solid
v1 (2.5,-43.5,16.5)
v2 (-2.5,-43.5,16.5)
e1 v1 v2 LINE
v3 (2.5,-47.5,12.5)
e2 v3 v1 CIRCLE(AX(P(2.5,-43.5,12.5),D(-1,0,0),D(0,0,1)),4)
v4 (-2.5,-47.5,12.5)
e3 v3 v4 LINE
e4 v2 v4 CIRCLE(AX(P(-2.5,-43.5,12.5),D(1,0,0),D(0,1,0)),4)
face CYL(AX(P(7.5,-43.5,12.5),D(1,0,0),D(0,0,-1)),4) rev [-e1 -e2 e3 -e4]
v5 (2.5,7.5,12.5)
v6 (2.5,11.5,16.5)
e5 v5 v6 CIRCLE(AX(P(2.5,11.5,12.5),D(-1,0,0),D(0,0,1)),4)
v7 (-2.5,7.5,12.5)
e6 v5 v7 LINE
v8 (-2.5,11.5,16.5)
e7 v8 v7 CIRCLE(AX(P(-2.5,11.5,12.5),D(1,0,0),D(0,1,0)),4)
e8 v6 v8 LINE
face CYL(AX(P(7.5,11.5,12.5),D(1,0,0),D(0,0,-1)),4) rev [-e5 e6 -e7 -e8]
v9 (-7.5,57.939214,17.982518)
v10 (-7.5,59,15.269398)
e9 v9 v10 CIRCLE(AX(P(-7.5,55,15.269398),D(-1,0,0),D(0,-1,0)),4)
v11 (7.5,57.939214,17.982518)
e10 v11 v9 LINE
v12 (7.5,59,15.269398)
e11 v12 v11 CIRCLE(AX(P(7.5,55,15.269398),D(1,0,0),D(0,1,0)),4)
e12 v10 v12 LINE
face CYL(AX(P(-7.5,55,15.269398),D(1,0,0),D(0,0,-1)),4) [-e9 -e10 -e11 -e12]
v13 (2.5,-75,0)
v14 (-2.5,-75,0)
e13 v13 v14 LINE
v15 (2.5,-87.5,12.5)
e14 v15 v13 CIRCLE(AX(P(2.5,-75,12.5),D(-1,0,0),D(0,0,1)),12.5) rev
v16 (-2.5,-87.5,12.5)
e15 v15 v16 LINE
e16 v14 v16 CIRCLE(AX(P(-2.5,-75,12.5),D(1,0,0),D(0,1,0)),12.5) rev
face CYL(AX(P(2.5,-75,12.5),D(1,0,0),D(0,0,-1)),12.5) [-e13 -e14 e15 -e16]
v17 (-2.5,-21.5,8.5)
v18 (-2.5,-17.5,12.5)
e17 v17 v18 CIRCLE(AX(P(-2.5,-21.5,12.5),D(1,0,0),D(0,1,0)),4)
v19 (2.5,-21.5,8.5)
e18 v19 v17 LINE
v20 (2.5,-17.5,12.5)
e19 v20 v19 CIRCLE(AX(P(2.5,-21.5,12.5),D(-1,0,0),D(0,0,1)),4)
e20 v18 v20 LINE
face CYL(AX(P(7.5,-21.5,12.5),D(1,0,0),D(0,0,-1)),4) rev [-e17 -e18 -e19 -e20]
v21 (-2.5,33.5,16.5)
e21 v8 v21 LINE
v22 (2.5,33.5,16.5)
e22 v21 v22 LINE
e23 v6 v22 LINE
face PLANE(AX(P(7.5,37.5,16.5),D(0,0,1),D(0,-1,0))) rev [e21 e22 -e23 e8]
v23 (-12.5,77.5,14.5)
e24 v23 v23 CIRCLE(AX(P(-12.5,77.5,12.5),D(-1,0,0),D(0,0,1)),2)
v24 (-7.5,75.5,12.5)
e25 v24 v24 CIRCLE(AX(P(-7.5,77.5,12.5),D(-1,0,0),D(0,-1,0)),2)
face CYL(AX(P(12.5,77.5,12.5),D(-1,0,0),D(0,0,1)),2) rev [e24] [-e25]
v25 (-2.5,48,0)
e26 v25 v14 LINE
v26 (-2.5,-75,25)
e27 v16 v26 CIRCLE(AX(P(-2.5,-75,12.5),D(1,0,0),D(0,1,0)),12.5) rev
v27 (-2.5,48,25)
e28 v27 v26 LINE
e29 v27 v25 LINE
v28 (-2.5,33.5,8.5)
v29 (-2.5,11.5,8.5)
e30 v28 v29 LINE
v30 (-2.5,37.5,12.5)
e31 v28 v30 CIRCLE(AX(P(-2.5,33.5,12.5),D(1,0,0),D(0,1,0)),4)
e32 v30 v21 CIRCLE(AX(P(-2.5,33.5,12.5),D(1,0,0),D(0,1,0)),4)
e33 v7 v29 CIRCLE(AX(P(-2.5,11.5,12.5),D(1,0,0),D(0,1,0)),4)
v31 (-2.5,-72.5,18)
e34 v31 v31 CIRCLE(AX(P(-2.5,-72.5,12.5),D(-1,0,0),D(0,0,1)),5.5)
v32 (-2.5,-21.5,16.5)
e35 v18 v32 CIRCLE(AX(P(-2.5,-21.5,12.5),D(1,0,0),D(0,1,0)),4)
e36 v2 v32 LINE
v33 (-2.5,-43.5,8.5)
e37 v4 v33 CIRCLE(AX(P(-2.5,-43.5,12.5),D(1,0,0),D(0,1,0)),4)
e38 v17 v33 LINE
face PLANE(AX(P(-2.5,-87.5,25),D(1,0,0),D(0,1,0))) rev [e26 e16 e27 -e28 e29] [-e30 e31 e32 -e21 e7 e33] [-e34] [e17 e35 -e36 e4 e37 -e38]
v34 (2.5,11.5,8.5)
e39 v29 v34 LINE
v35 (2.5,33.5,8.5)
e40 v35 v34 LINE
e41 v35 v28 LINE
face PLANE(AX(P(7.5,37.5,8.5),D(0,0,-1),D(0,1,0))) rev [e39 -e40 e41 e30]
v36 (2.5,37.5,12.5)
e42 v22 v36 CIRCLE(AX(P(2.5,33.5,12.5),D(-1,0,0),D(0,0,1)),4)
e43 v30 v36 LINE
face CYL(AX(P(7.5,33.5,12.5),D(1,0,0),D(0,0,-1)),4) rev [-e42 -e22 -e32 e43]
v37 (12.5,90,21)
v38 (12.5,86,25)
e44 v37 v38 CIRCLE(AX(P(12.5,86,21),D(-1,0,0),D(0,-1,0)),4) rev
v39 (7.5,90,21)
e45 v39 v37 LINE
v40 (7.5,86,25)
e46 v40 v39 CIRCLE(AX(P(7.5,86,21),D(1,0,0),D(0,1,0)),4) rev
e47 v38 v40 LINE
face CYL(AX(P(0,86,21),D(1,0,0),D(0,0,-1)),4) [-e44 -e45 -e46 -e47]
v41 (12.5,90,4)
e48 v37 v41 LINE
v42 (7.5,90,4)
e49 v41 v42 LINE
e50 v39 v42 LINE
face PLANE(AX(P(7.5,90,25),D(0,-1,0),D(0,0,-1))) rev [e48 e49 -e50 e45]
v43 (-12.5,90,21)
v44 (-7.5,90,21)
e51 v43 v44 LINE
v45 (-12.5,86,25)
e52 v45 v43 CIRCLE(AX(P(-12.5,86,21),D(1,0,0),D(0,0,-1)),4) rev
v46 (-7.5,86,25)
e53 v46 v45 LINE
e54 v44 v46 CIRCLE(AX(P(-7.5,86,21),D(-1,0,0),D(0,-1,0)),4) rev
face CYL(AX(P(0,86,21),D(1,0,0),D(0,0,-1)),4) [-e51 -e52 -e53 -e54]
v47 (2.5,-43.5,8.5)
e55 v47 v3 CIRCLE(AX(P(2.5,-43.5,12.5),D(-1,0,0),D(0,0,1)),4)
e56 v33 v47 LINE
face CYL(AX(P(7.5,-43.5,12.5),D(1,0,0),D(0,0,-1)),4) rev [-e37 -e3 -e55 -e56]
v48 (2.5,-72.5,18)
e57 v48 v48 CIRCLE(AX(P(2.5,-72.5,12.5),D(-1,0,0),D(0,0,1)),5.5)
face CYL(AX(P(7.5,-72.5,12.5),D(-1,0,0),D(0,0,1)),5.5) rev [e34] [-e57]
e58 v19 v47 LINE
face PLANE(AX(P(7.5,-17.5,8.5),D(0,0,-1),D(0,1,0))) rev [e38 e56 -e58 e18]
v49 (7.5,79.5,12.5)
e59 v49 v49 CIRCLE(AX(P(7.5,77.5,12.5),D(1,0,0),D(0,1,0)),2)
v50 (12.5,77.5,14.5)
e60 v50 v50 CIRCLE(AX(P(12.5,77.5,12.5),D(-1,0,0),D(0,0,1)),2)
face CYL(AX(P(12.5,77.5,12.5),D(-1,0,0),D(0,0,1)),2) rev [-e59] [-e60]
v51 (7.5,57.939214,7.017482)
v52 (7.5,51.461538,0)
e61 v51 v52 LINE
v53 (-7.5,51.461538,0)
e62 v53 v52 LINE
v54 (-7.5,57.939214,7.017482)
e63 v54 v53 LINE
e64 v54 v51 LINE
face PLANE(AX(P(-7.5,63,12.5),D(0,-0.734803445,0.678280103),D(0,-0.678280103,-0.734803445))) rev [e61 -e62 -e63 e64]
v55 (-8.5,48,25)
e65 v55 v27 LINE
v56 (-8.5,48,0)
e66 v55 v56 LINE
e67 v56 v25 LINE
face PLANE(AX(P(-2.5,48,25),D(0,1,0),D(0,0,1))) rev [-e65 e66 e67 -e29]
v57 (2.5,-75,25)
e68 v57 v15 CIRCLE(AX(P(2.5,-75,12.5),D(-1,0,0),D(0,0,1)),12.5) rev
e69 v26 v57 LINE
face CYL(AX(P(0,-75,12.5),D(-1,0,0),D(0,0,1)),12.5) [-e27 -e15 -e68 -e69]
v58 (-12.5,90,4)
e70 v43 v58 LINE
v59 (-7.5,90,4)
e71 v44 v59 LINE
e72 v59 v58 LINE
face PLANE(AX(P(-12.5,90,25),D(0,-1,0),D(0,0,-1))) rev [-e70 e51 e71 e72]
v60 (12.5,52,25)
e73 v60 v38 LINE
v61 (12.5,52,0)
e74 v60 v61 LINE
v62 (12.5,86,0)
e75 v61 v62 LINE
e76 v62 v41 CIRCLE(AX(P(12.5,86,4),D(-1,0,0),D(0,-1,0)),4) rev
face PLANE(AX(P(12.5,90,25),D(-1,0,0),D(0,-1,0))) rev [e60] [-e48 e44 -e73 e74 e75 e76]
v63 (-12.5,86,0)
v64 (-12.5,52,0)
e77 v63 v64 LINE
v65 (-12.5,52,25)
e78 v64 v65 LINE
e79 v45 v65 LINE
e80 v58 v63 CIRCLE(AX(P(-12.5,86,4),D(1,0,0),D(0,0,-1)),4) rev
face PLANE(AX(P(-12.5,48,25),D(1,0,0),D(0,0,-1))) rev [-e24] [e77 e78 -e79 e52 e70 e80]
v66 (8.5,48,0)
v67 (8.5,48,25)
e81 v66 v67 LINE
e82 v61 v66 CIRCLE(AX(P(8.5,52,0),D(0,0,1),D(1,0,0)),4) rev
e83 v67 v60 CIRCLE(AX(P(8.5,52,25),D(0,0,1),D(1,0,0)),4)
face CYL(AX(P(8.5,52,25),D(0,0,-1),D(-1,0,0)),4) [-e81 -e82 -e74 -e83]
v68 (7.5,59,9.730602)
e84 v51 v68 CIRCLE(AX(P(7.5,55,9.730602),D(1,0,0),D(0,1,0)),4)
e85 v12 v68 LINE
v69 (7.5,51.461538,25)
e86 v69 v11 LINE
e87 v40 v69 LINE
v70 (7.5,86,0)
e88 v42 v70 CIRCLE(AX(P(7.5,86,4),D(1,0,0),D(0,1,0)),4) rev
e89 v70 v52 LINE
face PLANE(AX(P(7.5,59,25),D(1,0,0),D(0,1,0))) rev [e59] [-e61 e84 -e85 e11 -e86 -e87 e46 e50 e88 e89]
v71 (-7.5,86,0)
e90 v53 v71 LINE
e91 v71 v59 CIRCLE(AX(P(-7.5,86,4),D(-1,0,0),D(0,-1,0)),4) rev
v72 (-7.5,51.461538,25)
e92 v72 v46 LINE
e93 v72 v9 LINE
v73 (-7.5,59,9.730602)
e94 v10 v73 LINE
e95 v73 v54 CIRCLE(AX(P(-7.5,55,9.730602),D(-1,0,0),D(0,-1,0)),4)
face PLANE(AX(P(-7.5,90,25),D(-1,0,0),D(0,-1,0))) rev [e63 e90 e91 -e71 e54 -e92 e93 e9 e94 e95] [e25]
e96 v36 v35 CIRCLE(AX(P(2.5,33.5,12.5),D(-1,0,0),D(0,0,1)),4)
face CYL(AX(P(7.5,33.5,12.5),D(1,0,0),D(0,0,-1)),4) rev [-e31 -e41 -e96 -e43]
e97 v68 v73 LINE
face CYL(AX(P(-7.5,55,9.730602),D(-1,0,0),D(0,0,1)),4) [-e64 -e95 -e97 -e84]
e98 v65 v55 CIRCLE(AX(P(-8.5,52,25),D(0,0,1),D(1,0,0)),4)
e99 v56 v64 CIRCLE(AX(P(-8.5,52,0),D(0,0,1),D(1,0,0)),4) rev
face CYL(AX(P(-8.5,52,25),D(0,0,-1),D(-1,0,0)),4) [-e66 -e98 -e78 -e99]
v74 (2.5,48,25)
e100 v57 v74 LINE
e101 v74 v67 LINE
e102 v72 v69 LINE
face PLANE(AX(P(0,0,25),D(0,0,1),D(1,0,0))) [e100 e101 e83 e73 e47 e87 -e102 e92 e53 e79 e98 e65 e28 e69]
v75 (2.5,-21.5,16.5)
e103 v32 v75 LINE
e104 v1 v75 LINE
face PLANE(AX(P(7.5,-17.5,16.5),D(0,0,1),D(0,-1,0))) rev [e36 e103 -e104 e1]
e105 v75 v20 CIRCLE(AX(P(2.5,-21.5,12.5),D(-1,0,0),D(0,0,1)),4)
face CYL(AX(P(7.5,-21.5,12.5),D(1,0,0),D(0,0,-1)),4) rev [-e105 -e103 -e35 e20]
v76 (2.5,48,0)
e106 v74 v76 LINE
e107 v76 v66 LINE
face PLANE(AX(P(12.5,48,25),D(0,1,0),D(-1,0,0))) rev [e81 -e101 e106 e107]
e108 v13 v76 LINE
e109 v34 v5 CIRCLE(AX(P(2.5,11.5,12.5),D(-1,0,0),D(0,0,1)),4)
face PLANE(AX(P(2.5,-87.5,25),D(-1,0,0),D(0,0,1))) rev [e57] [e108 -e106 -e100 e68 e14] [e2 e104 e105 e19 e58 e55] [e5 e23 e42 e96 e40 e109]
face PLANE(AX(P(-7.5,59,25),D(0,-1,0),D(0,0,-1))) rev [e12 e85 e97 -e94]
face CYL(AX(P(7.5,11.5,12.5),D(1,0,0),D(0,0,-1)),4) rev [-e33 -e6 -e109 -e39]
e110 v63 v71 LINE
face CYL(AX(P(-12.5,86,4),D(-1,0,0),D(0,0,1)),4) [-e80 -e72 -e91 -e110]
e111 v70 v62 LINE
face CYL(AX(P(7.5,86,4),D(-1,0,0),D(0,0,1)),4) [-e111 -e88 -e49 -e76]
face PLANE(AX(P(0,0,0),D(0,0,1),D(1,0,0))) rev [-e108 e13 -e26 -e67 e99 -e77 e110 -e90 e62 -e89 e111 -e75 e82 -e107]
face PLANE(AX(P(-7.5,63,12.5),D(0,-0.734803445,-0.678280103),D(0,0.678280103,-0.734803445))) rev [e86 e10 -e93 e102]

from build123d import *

# Parameters (mm, degrees)
Y_KSEKLIK_EKSTR_ZYON1_DEPTH = 25
IZIM2_R                     = 2
KES_EKSTR_ZYON1_DEPTH       = 25
IZIM3_R                     = 5.5
IZIM3_W                     = 8
IZIM3_H                     = 30
KES_EKSTR_ZYON2_DEPTH       = 10
CUT_EXTRUDE8_DEPTH          = 7.5
RADYUS1_R                   = 4
FILLET1_R                   = 12.5


with BuildPart() as part:
    # Çizim1 → Yükseklik-Ekstrüzyon1 (new body)
    with BuildSketch(Plane.XY):
        Polygon((-2.5, 48), (-12.5, 48), (-12.5, 90), (-7.5, 90), (-7.5, 59), (7.5, 59), (7.5, 90), (12.5, 90), (12.5, 48), (2.5, 48), (2.5, -87.5), (-2.5, -87.5), align=None)
    extrude(amount=Y_KSEKLIK_EKSTR_ZYON1_DEPTH)

    # Çizim2 → Kes-Ekstrüzyon1 (cut)
    with BuildSketch(Plane.ZY.offset(12.5)):
        with Locations((12.5, 77.5)):
            Circle(IZIM2_R)
    extrude(amount=-KES_EKSTR_ZYON1_DEPTH, mode=Mode.SUBTRACT)

    # Çizim3 → Kes-Ekstrüzyon2 (cut)
    with BuildSketch(Plane.ZY.offset(2.5)):
        with Locations((12.5, -72.5)):
            Circle(IZIM3_R)
        with Locations((12.5, 22.5)):
            Rectangle(IZIM3_W, IZIM3_H)
        with Locations((12.5, -32.5)):
            Rectangle(IZIM3_W, IZIM3_H)
    extrude(amount=-KES_EKSTR_ZYON2_DEPTH, mode=Mode.SUBTRACT)

    # Sketch2 → Cut-Extrude8 (cut, symmetric)
    with BuildSketch(Plane(origin=(0, 0, 0), x_dir=(0, 0, -1), z_dir=(1, 0, 0))):
        Polygon((-12.5, 63), (-25.5, 51), (-25.5, 65), (0.5, 65), (0.5, 51), align=None)
    extrude(amount=CUT_EXTRUDE8_DEPTH, both=True, mode=Mode.SUBTRACT)

    # Radyus1
    radyus1_edges = [part.edges().sort_by_distance(p)[0] for p in [
        (-10, 90, 25),
        (10, 90, 25),
        (10, 90, 0),
        (-10, 90, 0),
        (0, 7.5, 16.5),
        (0, 37.5, 16.5),
        (0, 7.5, 8.5),
        (0, 37.5, 8.5),
        (0, -47.5, 16.5),
        (0, -47.5, 8.5),
        (0, -17.5, 16.5),
        (0, -17.5, 8.5),
        (0, 59, 16.833333333),
        (0, 59, 8.166666667),
        (12.5, 48, 12.5),
        (-12.5, 48, 12.5),
    ]]
    fillet(radyus1_edges, radius=RADYUS1_R - 0.0001)  # a hair under: the kernel refuses the full size

    # Fillet1
    fillet1_edges = [part.edges().sort_by_distance(p)[0] for p in [
        (0, -87.5, 0),
        (0, -87.5, 25),
    ]]
    fillet(fillet1_edges, radius=FILLET1_R - 0.0001)  # a hair under: the kernel refuses the full size


solid = part.part
